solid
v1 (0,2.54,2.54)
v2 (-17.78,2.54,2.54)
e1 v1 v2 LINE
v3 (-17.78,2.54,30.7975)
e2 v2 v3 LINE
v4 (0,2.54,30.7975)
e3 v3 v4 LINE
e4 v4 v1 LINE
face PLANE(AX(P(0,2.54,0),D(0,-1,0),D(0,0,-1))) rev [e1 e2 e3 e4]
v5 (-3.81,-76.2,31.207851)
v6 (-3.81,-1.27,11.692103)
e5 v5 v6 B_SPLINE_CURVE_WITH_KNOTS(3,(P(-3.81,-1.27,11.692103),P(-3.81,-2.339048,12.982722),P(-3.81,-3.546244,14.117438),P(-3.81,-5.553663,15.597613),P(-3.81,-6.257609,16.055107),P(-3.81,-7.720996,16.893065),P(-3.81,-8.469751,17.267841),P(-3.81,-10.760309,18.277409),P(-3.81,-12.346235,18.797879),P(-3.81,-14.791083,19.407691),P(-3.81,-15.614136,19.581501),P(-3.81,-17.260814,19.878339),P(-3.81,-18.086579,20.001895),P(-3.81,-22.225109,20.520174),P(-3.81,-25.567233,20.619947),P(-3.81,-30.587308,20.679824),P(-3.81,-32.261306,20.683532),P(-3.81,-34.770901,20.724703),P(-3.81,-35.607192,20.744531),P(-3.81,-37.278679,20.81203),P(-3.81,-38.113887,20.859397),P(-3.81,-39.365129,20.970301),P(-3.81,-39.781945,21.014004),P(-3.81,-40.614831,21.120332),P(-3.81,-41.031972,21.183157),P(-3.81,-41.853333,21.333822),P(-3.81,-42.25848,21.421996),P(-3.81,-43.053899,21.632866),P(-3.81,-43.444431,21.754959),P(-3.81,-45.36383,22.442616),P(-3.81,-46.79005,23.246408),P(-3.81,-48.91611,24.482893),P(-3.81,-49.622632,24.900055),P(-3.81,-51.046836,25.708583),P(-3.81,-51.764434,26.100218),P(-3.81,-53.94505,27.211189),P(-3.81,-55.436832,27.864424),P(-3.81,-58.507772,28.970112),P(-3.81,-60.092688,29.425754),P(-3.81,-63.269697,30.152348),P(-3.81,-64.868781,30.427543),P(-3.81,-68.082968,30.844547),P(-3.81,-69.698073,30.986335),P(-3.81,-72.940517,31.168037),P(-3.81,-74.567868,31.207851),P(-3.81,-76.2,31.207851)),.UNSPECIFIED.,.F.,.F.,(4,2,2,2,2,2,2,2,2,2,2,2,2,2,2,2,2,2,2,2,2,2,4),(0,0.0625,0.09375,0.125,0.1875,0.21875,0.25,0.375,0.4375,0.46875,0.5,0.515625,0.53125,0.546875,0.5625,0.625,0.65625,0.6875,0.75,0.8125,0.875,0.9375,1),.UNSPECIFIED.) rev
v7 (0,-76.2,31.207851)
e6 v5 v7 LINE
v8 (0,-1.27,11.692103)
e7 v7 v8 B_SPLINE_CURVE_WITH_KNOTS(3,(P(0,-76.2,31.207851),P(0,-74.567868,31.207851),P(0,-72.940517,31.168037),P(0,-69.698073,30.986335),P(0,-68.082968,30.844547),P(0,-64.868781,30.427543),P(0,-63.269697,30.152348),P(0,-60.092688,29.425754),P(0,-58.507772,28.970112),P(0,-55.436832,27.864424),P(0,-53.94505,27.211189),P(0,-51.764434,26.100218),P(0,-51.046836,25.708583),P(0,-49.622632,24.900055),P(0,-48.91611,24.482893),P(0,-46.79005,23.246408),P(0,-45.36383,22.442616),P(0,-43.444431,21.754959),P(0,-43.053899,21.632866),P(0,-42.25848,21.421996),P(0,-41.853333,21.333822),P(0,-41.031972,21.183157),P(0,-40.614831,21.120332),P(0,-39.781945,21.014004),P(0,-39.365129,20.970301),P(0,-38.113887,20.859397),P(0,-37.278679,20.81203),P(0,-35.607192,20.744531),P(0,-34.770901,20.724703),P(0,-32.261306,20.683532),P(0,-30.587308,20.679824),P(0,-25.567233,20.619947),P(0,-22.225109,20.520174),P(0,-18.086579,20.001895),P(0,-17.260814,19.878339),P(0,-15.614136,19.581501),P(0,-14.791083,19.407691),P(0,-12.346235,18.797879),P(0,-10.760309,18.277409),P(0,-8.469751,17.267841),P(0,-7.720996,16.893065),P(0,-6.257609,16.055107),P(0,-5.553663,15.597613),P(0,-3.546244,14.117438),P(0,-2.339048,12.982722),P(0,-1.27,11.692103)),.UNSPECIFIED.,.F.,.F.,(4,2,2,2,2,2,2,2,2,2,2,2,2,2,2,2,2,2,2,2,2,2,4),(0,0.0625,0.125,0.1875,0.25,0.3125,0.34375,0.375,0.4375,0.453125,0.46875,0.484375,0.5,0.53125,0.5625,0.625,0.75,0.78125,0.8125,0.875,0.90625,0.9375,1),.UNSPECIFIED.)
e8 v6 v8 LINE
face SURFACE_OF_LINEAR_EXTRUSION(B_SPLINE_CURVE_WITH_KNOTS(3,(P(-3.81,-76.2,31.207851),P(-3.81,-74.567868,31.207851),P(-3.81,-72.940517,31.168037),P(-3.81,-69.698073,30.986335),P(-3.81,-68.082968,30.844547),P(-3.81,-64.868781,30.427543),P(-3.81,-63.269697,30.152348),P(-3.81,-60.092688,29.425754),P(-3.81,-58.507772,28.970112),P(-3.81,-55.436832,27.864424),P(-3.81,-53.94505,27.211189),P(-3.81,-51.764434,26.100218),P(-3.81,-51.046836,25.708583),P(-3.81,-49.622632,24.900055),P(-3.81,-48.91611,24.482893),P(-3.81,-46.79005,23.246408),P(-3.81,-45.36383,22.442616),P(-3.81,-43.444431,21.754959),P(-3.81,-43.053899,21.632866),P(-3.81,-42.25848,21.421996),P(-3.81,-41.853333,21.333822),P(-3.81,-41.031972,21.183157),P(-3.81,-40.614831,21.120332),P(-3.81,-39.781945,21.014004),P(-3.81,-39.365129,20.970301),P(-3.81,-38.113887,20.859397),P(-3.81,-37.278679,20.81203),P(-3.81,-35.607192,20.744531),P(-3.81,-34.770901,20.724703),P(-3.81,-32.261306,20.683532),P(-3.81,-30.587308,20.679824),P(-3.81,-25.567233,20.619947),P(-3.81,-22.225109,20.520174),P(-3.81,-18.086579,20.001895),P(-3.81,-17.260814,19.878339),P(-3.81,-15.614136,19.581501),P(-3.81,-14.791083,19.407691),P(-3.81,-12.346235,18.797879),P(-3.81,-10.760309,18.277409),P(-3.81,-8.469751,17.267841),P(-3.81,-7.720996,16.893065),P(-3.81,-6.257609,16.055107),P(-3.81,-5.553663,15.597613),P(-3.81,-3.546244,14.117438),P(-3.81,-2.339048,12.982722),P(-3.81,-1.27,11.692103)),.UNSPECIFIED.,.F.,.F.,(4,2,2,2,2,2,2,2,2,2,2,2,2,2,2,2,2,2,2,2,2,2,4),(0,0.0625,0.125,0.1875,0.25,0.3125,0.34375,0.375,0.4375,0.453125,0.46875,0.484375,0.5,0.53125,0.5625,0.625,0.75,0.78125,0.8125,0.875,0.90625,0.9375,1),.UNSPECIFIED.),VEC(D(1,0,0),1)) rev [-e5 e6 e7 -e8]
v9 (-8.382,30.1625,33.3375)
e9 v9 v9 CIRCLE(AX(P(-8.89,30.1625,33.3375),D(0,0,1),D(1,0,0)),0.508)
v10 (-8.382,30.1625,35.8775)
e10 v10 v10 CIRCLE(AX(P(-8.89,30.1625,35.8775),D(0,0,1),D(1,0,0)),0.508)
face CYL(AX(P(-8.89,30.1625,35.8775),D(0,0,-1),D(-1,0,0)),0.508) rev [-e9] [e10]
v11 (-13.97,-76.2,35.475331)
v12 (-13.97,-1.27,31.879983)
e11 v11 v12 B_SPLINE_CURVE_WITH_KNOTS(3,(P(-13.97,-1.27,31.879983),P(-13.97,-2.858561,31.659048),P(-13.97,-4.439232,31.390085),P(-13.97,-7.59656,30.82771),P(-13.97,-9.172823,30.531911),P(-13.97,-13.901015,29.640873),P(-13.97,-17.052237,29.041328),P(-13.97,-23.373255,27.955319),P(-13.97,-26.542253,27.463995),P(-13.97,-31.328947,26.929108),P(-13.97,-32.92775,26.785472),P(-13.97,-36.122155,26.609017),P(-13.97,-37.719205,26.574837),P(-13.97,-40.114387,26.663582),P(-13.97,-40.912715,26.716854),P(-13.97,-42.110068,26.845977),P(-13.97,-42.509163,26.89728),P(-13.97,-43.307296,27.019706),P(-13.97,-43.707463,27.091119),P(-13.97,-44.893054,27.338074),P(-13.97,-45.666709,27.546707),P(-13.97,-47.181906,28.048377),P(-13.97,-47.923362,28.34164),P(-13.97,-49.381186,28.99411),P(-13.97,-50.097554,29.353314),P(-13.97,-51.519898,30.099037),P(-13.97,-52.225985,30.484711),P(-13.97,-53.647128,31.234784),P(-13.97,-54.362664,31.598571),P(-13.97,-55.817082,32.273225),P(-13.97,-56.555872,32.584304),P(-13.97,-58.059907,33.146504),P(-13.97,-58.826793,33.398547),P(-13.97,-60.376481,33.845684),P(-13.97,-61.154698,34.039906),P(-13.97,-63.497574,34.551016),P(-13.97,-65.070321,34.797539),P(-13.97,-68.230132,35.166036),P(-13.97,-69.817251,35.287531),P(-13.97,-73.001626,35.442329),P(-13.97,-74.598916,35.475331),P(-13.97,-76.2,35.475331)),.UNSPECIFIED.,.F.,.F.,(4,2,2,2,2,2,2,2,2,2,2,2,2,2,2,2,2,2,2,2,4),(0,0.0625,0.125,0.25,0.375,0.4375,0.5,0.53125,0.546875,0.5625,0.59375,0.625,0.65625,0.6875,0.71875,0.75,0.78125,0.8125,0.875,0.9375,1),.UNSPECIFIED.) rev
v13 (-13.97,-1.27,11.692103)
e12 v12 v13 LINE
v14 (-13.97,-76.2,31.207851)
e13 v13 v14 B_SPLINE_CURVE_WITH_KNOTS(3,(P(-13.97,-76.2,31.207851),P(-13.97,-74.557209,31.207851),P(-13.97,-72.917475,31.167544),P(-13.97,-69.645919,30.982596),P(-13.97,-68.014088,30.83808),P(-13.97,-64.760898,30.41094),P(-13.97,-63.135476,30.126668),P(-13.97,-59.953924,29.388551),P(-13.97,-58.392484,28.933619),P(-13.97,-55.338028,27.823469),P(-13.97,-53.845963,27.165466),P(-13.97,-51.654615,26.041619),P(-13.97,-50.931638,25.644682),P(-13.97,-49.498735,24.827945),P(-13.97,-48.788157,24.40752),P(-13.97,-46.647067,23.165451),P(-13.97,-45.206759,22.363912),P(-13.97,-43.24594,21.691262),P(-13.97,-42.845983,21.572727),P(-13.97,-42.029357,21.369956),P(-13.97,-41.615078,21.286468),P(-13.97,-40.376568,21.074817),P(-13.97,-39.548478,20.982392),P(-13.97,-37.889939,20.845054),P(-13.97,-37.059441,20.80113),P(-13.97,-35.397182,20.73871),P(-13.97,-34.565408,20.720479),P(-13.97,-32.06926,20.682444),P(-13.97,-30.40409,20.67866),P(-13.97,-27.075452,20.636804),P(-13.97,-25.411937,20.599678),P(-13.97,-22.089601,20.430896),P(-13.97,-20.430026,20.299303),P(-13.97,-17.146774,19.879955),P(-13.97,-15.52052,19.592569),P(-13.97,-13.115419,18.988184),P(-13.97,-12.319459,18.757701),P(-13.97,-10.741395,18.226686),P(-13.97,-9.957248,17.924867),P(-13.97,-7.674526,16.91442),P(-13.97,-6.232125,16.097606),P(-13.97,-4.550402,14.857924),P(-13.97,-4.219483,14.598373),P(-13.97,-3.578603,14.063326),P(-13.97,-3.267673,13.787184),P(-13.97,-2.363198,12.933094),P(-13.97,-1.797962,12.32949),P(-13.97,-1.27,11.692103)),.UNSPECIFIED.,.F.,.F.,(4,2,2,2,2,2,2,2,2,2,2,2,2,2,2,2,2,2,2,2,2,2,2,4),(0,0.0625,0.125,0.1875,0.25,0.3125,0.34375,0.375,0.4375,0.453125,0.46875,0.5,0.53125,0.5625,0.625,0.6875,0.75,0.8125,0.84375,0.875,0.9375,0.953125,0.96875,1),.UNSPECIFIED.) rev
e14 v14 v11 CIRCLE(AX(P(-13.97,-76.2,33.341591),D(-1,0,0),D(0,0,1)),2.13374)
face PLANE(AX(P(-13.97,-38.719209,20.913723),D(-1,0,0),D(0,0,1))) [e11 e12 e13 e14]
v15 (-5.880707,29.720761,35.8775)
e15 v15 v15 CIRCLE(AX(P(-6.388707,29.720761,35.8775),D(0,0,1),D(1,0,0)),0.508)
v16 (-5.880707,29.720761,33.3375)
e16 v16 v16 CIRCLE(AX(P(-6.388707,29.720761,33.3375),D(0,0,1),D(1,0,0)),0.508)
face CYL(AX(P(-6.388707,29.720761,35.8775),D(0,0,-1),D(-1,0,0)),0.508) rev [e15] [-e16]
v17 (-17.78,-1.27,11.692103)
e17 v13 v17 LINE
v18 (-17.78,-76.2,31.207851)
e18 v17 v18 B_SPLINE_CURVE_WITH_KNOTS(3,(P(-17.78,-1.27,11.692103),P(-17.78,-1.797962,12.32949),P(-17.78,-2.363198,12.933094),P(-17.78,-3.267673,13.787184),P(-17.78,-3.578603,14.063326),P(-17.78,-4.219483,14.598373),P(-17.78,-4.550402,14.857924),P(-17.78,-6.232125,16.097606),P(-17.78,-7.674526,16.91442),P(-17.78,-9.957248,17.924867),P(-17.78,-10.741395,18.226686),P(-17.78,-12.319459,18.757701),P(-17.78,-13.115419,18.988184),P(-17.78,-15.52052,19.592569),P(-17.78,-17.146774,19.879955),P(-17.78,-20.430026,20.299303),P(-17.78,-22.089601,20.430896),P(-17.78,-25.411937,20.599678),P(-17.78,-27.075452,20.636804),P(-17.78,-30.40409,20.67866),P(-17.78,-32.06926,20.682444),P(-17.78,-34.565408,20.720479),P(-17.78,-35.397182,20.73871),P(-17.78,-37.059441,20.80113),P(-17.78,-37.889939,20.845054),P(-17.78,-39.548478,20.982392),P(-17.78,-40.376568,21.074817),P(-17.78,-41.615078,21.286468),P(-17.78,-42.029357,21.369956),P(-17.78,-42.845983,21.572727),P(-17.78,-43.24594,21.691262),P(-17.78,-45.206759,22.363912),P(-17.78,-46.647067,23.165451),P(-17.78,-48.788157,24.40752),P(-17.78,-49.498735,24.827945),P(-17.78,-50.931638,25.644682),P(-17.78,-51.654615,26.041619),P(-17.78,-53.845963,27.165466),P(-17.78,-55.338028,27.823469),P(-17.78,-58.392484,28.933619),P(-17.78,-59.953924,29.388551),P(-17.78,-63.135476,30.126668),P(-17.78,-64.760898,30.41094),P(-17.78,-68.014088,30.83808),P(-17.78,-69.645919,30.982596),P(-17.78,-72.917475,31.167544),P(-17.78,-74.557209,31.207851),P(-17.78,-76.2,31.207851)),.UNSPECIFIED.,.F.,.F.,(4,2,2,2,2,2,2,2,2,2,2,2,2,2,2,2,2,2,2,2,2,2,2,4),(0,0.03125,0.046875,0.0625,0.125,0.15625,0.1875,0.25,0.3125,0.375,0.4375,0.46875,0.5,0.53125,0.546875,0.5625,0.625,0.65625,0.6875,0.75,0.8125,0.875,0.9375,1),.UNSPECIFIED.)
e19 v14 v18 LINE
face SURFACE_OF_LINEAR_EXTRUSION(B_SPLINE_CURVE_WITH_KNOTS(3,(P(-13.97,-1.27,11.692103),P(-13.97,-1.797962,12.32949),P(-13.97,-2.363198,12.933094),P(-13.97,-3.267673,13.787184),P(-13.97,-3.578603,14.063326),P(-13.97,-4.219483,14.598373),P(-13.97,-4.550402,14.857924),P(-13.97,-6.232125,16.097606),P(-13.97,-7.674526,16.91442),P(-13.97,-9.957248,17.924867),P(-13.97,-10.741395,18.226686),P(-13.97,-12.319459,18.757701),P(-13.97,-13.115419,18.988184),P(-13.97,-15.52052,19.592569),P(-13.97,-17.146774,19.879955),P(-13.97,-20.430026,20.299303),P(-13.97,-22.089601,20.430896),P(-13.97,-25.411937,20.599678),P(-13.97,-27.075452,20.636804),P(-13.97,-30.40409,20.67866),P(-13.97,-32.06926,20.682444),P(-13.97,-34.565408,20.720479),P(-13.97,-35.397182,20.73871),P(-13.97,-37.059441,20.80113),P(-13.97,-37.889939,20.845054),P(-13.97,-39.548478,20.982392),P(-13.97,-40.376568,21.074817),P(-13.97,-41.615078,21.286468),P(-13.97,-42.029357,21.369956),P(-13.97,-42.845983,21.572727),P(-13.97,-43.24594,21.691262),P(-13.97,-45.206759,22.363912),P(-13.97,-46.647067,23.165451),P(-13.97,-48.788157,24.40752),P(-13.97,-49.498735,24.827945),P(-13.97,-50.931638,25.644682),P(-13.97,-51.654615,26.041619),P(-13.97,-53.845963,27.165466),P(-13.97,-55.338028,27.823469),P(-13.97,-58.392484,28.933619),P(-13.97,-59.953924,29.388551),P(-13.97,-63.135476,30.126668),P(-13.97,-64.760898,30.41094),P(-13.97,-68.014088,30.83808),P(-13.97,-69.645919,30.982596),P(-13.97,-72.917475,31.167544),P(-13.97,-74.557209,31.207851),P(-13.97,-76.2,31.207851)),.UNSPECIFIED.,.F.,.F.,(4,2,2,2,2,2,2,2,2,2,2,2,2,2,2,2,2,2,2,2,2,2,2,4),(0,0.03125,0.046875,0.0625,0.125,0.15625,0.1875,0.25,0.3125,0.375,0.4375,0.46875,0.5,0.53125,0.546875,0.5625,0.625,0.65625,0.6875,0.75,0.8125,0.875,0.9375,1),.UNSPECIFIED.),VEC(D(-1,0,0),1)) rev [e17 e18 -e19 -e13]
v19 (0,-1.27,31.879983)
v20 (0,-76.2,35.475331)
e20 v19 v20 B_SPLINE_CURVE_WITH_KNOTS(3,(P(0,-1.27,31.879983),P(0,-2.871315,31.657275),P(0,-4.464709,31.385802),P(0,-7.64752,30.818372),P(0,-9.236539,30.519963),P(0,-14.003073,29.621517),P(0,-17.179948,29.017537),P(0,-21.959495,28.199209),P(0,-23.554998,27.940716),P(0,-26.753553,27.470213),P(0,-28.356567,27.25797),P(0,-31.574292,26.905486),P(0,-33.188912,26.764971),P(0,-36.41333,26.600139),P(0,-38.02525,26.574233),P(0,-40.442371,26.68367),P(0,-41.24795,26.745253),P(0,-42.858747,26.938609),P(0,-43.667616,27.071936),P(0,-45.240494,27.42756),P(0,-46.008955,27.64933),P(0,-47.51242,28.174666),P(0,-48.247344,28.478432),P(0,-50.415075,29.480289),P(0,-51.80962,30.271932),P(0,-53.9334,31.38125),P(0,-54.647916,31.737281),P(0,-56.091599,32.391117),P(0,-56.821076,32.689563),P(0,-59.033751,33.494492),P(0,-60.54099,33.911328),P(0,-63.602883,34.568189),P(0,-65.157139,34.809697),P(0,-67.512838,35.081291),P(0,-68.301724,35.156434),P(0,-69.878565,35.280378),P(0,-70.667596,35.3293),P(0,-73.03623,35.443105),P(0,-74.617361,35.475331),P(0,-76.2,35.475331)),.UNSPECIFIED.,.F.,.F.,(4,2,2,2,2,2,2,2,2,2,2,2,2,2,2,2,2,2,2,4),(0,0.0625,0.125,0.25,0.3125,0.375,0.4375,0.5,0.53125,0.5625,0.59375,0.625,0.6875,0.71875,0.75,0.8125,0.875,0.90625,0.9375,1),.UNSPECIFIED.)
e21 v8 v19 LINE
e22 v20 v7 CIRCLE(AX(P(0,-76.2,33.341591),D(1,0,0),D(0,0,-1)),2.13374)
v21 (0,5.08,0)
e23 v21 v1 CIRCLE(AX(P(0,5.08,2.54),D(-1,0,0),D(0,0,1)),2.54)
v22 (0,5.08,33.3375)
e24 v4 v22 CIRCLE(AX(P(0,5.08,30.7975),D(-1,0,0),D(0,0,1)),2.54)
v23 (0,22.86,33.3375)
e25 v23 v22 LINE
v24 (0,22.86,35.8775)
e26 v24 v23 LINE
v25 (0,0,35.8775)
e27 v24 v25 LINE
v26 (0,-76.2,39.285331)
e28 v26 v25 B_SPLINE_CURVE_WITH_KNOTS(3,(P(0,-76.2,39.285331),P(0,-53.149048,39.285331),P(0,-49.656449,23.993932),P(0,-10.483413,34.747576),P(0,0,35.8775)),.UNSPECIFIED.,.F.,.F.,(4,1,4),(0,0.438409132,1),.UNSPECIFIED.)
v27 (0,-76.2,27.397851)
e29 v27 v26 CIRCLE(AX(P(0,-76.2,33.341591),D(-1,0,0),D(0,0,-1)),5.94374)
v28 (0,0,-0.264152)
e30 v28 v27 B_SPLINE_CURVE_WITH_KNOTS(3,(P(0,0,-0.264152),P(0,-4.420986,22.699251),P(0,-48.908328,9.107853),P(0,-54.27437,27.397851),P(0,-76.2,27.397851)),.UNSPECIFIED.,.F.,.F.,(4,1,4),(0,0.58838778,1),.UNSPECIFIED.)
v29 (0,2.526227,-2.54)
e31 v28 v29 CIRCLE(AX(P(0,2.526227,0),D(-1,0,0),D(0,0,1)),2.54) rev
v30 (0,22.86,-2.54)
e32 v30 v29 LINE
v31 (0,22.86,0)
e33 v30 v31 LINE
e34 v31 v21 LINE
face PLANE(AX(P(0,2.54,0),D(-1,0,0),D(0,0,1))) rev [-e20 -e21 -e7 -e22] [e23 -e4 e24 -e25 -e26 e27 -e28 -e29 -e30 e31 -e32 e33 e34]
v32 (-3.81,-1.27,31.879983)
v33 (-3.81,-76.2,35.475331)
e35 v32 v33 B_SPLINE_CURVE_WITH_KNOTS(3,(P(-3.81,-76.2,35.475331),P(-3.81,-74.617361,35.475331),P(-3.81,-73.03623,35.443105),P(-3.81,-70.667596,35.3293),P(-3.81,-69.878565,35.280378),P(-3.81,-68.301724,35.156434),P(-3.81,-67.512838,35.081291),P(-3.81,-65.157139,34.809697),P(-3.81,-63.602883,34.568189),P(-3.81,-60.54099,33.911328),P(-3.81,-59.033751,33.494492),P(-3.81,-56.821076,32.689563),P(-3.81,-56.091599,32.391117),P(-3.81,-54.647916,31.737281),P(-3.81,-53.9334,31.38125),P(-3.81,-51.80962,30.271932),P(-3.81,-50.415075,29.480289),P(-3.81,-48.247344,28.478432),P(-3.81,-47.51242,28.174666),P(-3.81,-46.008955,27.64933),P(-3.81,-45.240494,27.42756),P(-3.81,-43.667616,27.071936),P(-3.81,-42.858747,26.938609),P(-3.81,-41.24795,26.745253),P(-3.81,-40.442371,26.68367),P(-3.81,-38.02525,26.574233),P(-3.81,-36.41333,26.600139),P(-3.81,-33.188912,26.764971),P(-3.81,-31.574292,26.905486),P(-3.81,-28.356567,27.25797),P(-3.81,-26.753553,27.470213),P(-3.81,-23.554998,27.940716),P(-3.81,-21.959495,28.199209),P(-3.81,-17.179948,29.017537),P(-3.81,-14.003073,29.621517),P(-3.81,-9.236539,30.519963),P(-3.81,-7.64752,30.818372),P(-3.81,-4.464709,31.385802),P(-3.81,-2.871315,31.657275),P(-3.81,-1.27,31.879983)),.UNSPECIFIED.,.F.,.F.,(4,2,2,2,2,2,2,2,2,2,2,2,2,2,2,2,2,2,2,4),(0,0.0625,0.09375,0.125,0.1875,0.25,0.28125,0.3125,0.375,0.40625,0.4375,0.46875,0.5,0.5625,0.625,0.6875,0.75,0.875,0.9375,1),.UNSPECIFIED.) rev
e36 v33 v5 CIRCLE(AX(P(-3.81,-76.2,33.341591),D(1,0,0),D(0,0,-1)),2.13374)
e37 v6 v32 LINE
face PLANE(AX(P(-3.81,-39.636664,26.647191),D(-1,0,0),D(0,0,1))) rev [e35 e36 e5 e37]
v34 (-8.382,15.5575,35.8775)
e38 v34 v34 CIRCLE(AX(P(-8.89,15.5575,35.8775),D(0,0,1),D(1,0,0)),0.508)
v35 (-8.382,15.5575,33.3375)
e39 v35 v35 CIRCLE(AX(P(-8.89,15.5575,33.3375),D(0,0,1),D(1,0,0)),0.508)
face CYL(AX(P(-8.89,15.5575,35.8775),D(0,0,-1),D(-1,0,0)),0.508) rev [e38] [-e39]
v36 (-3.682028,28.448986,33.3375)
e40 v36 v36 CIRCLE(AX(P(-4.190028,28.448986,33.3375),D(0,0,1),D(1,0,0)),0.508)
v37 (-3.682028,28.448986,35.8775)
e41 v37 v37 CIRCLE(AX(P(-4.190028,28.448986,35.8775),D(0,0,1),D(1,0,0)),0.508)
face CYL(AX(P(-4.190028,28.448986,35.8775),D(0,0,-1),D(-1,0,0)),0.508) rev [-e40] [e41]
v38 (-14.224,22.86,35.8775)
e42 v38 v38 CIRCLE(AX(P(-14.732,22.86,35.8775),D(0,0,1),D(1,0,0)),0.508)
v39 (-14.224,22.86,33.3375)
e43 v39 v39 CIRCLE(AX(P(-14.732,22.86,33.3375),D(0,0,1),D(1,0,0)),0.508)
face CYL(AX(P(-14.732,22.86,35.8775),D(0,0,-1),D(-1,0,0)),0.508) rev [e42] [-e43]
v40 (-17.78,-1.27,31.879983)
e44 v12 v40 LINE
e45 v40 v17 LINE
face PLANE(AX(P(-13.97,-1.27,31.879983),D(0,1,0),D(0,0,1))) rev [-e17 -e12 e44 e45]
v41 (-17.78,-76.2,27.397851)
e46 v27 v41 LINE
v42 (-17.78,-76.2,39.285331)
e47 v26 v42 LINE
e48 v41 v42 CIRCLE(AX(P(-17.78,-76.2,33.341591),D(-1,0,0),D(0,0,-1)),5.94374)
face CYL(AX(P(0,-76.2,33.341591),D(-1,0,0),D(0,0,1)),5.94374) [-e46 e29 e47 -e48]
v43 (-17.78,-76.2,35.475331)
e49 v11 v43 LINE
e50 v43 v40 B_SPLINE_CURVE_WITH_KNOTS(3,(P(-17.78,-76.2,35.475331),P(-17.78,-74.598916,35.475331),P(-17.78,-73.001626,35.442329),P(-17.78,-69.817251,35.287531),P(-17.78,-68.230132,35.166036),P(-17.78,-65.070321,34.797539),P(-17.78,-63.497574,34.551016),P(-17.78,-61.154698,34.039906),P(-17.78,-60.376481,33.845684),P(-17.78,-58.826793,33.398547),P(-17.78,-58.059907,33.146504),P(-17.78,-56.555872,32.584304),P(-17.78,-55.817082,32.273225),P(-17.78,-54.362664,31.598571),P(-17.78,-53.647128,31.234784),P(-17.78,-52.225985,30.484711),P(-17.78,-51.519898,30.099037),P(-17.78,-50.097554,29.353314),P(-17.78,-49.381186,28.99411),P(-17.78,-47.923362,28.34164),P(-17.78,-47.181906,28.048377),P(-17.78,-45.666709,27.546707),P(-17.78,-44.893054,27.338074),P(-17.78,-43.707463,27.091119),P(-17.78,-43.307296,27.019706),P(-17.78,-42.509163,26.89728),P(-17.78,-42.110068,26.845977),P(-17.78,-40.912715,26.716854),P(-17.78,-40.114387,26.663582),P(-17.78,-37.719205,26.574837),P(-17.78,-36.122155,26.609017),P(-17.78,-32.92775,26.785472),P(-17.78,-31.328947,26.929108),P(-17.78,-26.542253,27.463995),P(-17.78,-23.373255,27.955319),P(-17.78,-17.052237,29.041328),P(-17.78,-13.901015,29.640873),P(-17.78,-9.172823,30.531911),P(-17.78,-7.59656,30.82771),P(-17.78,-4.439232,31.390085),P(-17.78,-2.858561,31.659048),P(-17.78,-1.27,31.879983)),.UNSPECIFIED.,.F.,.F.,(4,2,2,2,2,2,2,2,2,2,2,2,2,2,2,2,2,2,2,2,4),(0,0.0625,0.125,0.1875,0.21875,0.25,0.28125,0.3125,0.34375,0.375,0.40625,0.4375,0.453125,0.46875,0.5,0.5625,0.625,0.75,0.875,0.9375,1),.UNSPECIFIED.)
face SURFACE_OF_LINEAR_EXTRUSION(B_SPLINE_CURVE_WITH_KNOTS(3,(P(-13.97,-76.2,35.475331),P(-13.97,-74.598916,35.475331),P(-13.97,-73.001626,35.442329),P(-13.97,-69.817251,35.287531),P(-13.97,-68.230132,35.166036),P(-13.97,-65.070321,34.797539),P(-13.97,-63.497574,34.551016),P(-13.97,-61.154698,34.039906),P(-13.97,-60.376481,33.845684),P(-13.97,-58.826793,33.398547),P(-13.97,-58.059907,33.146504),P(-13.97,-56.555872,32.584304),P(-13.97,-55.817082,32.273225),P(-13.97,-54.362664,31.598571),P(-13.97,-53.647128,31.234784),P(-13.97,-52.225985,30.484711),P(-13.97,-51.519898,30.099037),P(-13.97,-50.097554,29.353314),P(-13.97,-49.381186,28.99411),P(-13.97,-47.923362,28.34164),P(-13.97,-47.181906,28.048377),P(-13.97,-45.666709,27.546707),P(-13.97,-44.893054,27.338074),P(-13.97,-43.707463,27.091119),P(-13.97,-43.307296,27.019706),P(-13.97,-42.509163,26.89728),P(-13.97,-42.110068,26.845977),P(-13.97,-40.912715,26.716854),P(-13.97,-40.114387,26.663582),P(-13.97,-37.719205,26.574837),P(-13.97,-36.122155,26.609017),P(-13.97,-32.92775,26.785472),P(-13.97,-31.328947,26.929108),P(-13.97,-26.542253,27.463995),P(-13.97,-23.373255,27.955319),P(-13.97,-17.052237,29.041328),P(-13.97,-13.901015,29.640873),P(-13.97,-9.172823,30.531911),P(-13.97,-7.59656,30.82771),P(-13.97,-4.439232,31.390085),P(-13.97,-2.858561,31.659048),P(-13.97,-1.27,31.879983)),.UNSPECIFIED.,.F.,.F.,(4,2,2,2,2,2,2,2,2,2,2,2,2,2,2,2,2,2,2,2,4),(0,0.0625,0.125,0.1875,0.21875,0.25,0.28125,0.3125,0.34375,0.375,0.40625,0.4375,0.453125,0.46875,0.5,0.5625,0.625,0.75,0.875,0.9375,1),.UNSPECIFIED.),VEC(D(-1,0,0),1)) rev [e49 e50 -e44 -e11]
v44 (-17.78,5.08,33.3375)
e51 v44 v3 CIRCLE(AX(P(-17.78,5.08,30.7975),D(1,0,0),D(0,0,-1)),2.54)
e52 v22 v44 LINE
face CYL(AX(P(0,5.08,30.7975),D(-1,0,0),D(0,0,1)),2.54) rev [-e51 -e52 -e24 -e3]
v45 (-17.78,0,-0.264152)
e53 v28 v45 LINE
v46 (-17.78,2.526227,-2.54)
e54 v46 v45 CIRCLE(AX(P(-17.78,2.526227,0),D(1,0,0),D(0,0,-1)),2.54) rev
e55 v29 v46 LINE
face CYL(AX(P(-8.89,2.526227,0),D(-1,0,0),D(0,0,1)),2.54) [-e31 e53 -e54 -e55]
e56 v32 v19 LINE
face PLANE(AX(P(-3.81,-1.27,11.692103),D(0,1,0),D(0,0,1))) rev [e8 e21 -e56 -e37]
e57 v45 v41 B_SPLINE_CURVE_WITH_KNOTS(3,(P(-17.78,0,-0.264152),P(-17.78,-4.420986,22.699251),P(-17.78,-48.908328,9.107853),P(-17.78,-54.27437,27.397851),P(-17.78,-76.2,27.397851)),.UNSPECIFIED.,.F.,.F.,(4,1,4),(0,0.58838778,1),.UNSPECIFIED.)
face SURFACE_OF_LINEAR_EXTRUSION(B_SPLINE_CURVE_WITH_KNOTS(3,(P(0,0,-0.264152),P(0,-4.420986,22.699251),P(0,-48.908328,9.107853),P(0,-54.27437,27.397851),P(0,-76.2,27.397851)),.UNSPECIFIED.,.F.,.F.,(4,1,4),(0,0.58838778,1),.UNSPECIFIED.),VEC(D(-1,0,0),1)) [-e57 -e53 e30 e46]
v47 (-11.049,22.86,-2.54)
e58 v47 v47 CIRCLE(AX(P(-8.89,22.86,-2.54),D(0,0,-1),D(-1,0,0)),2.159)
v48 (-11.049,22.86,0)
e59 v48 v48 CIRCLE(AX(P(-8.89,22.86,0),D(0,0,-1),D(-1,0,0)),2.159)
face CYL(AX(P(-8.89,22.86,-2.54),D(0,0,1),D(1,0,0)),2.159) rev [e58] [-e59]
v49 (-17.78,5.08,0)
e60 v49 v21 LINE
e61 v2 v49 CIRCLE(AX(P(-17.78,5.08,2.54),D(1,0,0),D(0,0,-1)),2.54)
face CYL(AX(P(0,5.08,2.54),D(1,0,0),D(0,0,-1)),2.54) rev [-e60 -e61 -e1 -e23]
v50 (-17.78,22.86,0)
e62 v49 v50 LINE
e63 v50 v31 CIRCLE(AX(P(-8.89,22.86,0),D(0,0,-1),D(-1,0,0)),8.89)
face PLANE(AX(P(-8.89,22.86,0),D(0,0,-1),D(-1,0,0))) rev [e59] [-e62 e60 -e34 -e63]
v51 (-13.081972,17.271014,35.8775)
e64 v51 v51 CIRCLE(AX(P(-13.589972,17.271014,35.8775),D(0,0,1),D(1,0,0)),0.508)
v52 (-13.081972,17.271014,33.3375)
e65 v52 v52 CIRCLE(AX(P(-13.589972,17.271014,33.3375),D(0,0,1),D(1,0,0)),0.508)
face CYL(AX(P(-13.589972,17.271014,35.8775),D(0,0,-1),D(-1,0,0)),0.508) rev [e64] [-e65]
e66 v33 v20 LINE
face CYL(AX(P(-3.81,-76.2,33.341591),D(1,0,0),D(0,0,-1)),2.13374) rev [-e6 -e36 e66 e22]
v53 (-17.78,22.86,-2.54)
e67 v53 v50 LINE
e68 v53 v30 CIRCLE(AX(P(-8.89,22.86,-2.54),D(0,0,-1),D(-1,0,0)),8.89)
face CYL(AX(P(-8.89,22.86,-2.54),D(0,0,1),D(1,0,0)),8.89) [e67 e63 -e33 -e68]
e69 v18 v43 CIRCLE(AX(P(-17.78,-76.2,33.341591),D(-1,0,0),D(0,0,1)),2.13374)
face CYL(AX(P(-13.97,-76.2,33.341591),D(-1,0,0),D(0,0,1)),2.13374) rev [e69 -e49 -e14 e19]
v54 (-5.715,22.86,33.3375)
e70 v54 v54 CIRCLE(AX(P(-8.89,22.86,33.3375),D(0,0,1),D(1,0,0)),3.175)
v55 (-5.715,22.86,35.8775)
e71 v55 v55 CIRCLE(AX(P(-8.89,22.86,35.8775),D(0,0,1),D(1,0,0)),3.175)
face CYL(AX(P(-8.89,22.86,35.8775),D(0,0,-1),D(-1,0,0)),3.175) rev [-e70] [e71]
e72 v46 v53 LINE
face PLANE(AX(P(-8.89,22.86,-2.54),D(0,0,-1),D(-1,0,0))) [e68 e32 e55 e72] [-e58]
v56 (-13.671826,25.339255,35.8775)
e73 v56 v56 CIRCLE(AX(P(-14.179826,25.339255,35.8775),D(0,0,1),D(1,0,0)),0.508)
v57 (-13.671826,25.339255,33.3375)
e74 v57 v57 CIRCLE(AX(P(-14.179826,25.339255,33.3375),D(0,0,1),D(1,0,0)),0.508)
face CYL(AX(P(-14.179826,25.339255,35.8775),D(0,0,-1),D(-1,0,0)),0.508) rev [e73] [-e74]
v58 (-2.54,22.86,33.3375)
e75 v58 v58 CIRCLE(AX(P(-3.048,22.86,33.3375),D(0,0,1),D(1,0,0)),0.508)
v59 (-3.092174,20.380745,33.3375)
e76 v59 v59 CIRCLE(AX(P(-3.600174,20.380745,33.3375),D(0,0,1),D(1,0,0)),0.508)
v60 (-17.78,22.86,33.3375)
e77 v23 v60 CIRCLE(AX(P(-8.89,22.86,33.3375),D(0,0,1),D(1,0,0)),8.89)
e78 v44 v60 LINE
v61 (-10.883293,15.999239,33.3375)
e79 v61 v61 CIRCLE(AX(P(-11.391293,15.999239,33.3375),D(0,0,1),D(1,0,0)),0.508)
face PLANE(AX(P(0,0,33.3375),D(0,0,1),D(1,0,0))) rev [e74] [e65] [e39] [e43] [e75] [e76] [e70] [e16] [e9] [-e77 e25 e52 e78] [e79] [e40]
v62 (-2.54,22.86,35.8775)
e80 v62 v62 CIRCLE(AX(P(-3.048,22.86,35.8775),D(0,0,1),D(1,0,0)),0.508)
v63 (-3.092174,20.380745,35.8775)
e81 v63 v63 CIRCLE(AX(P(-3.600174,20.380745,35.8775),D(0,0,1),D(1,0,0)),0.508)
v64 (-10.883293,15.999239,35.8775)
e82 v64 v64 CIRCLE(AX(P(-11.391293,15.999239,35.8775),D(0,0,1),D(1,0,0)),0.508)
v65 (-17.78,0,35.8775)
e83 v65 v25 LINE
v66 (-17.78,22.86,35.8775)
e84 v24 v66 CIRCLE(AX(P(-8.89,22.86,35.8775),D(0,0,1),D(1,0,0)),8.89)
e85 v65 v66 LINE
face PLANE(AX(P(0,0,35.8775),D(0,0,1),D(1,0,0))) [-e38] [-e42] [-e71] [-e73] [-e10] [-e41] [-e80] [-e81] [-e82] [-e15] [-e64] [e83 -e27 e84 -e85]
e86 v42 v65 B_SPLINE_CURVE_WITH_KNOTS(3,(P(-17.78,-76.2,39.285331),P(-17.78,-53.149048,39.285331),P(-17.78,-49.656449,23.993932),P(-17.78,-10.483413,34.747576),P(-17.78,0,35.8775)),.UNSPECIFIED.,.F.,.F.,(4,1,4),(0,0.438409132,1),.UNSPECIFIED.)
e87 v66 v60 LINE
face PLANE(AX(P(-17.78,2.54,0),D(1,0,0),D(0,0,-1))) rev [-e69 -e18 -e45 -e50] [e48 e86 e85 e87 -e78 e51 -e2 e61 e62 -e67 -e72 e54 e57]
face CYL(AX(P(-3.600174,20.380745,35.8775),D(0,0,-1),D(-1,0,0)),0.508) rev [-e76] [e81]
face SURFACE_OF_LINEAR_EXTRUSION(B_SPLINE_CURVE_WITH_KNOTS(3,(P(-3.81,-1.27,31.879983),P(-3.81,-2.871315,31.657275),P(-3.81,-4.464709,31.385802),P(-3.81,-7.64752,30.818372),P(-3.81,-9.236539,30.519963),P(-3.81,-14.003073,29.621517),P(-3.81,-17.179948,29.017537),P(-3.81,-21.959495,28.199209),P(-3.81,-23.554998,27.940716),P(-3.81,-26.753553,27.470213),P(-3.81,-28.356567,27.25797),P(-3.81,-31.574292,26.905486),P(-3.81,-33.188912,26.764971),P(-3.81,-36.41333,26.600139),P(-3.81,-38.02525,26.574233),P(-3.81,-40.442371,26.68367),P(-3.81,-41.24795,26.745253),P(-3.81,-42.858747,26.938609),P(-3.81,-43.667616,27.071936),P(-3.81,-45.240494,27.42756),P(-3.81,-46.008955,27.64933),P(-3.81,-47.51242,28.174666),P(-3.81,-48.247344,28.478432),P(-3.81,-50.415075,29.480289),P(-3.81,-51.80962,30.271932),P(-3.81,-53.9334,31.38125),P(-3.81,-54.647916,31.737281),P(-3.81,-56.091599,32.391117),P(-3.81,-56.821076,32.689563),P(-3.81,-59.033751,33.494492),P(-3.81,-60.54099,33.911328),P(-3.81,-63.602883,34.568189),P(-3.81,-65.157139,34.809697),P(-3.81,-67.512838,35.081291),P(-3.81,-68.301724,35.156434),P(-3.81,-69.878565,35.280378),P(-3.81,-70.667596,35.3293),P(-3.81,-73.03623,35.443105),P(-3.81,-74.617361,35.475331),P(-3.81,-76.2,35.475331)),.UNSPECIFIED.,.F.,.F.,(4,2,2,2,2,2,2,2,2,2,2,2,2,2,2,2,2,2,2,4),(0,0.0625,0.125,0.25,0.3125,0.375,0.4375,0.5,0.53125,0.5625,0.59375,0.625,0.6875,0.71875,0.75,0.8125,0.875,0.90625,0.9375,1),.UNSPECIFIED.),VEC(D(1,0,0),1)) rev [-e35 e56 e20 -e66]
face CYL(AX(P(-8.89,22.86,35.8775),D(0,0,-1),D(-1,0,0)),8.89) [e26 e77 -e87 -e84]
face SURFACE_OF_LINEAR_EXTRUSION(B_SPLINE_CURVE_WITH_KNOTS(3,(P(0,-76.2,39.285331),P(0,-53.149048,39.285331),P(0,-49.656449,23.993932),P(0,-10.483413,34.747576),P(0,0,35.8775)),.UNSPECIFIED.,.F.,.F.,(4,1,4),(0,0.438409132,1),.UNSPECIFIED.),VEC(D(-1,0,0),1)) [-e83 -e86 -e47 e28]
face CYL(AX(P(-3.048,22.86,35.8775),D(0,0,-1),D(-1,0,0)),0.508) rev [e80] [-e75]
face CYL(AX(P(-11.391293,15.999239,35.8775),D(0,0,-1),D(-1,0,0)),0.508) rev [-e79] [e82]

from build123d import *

# Parameters (mm, degrees)
SKETCH1_W           = 17.78
SKETCH1_H           = 33.3375
BOSS_EXTRUDE1_DEPTH = 2.54
SKETCH2_R           = 0.508
SKETCH2_R_2         = 3.175
BOSS_EXTRUDE2_DEPTH = 2.54
BOSS_EXTRUDE3_START = 2.54
SKETCH3_R           = 2.159
BOSS_EXTRUDE3_DEPTH = 2.54
BOSS_EXTRUDE5_DEPTH = 17.78
CUT_EXTRUDE2_DEPTH  = 3.81
CUT_EXTRUDE3_START  = -3.81
CUT_EXTRUDE3_DEPTH  = 3.81
FILLET1_START       = -19
FILLET1_DEPTH       = 20
FILLET1_START_2     = -17.78
FILLET1_2_DEPTH     = 17.78


with BuildPart() as part:
    # Sketch1 → Boss-Extrude1 (new body)
    with BuildSketch(Plane(origin=(0, 0, 0), x_dir=(1, 0, 0), z_dir=(0, 1, 0))):
        with Locations((-8.89, -16.66875)):
            Rectangle(SKETCH1_W, SKETCH1_H)
    extrude(amount=BOSS_EXTRUDE1_DEPTH)

    # Sketch2 → Boss-Extrude2 (add)
    with BuildSketch(Plane.XY.offset(33.3375)):
        with BuildLine():
            Line((-17.78, 0), (0, 0))
            Line((0, 0), (0, 22.86))
            ThreePointArc((0, 22.86), (-8.89, 31.75), (-17.78, 22.86))
            Line((-17.78, 22.86), (-17.78, 0))
        make_face()
        with Locations((-4.190027947, 28.448986398)):
            Circle(SKETCH2_R, mode=Mode.SUBTRACT)
        with Locations((-8.89, 15.5575)):
            Circle(SKETCH2_R, mode=Mode.SUBTRACT)
        with Locations((-13.589972053, 17.271013602)):
            Circle(SKETCH2_R, mode=Mode.SUBTRACT)
        with Locations((-14.732, 22.86)):
            Circle(SKETCH2_R, mode=Mode.SUBTRACT)
        with Locations((-11.391292974, 15.99923913)):
            Circle(SKETCH2_R, mode=Mode.SUBTRACT)
        with Locations((-14.179826087, 25.339254721)):
            Circle(SKETCH2_R, mode=Mode.SUBTRACT)
        with Locations((-8.89, 22.86)):
            Circle(SKETCH2_R_2, mode=Mode.SUBTRACT)
        with Locations((-3.600173913, 20.380745279)):
            Circle(SKETCH2_R, mode=Mode.SUBTRACT)
        with Locations((-3.048, 22.86)):
            Circle(SKETCH2_R, mode=Mode.SUBTRACT)
        with Locations((-8.89, 30.1625)):
            Circle(SKETCH2_R, mode=Mode.SUBTRACT)
        with Locations((-6.388707026, 29.72076087)):
            Circle(SKETCH2_R, mode=Mode.SUBTRACT)
    extrude(amount=BOSS_EXTRUDE2_DEPTH)

    # Sketch3 → Boss-Extrude3 (add)
    with BuildSketch(Plane(origin=(0, 0, 0), x_dir=(-1, 0, 0), z_dir=(0, 0, -1)).offset(BOSS_EXTRUDE3_START)):
        with BuildLine():
            Line((0, 22.86), (0, 0))
            Line((0, 0), (17.78, 0))
            Line((17.78, 0), (17.78, 22.86))
            ThreePointArc((17.78, 22.86), (8.89, 31.75), (0, 22.86))
        make_face()
        with Locations((8.89, 22.86)):
            Circle(SKETCH3_R, mode=Mode.SUBTRACT)
    extrude(amount=-BOSS_EXTRUDE3_DEPTH)

    # Sketch7 → Boss-Extrude5 (add)
    with BuildSketch(Plane.ZY.offset(17.78)):
        with BuildLine():
            Line((-0.264151635, 0), (35.8775, 0))
            add(Edge.make_bspline(
                [(35.8775, 0), (34.747575759, -10.483413435), (23.993931567, -49.656448715), (39.285331068, -53.149048012), (39.285331068, -76.2)],
                knots=[0, 0, 0, 0, 0.561590868, 1, 1, 1, 1], degree=3))
            ThreePointArc((39.285331068, -76.2), (33.341590809, -82.143740259), (27.39785055, -76.2))
            add(Edge.make_bspline(
                [(-0.264151635, 0), (22.699251274, -4.420985832), (9.107853477, -48.908327851), (27.39785055, -54.27437044), (27.39785055, -76.2)],
                knots=[0, 0, 0, 0, 0.58838778, 1, 1, 1, 1], degree=3))
        make_face()
    extrude(amount=-BOSS_EXTRUDE5_DEPTH)

    # Sketch8 → Cut-Extrude2 (cut)
    with BuildSketch(Plane.ZY.offset(17.78)):
        with BuildLine():
            Line((31.87998254, -1.27), (11.692102825, -1.27))
            add(Edge.make_bspline(
                [(11.692102825, -1.27), (12.329490215, -1.797961739), (12.933094236, -2.363198397), (13.787184198, -3.267673027), (14.063326101, -3.578603465), (14.598372835, -4.219482884), (14.857923986, -4.550402014), (16.097605696, -6.232124946), (16.914419625, -7.674525947), (17.924867424, -9.957247581), (18.226686047, -10.741395079), (18.75770144, -12.319459012), (18.988184221, -13.115418962), (19.592569091, -15.520520104), (19.879955273, -17.146774279), (20.299302948, -20.430025875), (20.430895911, -22.089601111), (20.599678207, -25.411936863), (20.636803846, -27.075451594), (20.67865973, -30.404089571), (20.682443911, -32.069259792), (20.720479253, -34.565408412), (20.738709961, -35.397182268), (20.801129707, -37.059441081), (20.845054145, -37.889939176), (20.982392235, -39.548478099), (21.074816708, -40.376568042), (21.286468297, -41.615077579), (21.36995575, -42.029357232), (21.572726897, -42.845983081), (21.691262012, -43.245940154), (22.363912109, -45.206759154), (23.165451305, -46.647067415), (24.407519941, -48.78815743), (24.827945274, -49.498734604), (25.64468202, -50.93163809), (26.041618909, -51.654615352), (27.165466006, -53.845963493), (27.8234689, -55.338028422), (28.933619451, -58.392484093), (29.388551341, -59.953923666), (30.126668316, -63.135476247), (30.410939534, -64.760898165), (30.838079835, -68.014087747), (30.982595978, -69.645919189), (31.167543607, -72.917475244), (31.20785055, -74.557209301), (31.20785055, -76.2)],
                knots=[0, 0, 0, 0, 0.03125, 0.03125, 0.046875, 0.046875, 0.0625, 0.0625, 0.125, 0.125, 0.15625, 0.15625, 0.1875, 0.1875, 0.25, 0.25, 0.3125, 0.3125, 0.375, 0.375, 0.4375, 0.4375, 0.46875, 0.46875, 0.5, 0.5, 0.53125, 0.53125, 0.546875, 0.546875, 0.5625, 0.5625, 0.625, 0.625, 0.65625, 0.65625, 0.6875, 0.6875, 0.75, 0.75, 0.8125, 0.8125, 0.875, 0.875, 0.9375, 0.9375, 1, 1, 1, 1], degree=3))
            ThreePointArc((31.20785055, -76.2), (33.341590809, -78.333740259), (35.475331068, -76.2))
            add(Edge.make_bspline(
                [(35.475331068, -76.2), (35.475331068, -74.59891608), (35.442328522, -73.001625639), (35.287530724, -69.817251041), (35.166036456, -68.230132286), (34.79753857, -65.070321456), (34.55101578, -63.497574112), (34.039906006, -61.154697774), (33.84568435, -60.376480634), (33.398546609, -58.826792987), (33.146503607, -58.05990662), (32.584304123, -56.555872408), (32.273225256, -55.817082229), (31.598571017, -54.362663568), (31.234783966, -53.64712848), (30.484711446, -52.225984708), (30.099036577, -51.51989769), (29.353314006, -50.097553632), (28.994109895, -49.38118555), (28.341640461, -47.923362101), (28.048377395, -47.181905876), (27.546707249, -45.666708842), (27.338073983, -44.893054089), (27.09111876, -43.70746341), (27.01970601, -43.307296259), (26.897279987, -42.509162839), (26.845976833, -42.1100683), (26.716854196, -40.912715076), (26.663581813, -40.114387456), (26.574836598, -37.719205009), (26.609016601, -36.12215458), (26.785471939, -32.927750164), (26.929107807, -31.328947255), (27.463994787, -26.542252957), (27.955318949, -23.373254872), (29.041327858, -17.052236889), (29.640872623, -13.901015305), (30.531911147, -9.172823068), (30.827709929, -7.596559566), (31.390084509, -4.439232344), (31.659048397, -2.858560896), (31.87998254, -1.27)],
                knots=[0, 0, 0, 0, 0.0625, 0.0625, 0.125, 0.125, 0.1875, 0.1875, 0.21875, 0.21875, 0.25, 0.25, 0.28125, 0.28125, 0.3125, 0.3125, 0.34375, 0.34375, 0.375, 0.375, 0.40625, 0.40625, 0.4375, 0.4375, 0.453125, 0.453125, 0.46875, 0.46875, 0.5, 0.5, 0.5625, 0.5625, 0.625, 0.625, 0.75, 0.75, 0.875, 0.875, 0.9375, 0.9375, 1, 1, 1, 1], degree=3))
        make_face()
    extrude(amount=-CUT_EXTRUDE2_DEPTH, mode=Mode.SUBTRACT)

    # Sketch9 → Cut-Extrude3 (cut)
    with BuildSketch(Plane(origin=(0, 0, 0), x_dir=(0, 0, -1), z_dir=(1, 0, 0)).offset(CUT_EXTRUDE3_START)):
        with BuildLine():
            Line((-11.692102825, -1.27), (-31.87998254, -1.27))
            add(Edge.make_bspline(
                [(-31.87998254, -1.27), (-31.657274592, -2.871314909), (-31.385801547, -4.464709015), (-30.818371841, -7.647520411), (-30.519962643, -9.236539341), (-29.621517161, -14.003073455), (-29.017536871, -17.179948025), (-28.199208606, -21.959495394), (-27.940716, -23.554997883), (-27.470213202, -26.753552893), (-27.257969555, -28.356567493), (-26.905486134, -31.574292118), (-26.764970951, -33.188911509), (-26.600139399, -36.413329948), (-26.5742329, -38.025249954), (-26.68367025, -40.442370979), (-26.74525272, -41.247949508), (-26.938608863, -42.85874733), (-27.071936421, -43.667615889), (-27.427560468, -45.240494251), (-27.649330164, -46.008954577), (-28.17466612, -47.512420124), (-28.47843167, -48.247343835), (-29.480288911, -50.415075343), (-30.271932345, -51.809620123), (-31.381249819, -53.933399988), (-31.737281071, -54.64791605), (-32.39111668, -56.091599244), (-32.689563076, -56.821075957), (-33.494491888, -59.033751249), (-33.911327537, -60.540990207), (-34.568189194, -63.60288278), (-34.809697436, -65.157138907), (-35.081291118, -67.512837521), (-35.156433699, -68.301724496), (-35.28037816, -69.878565078), (-35.329299977, -70.667595867), (-35.443105132, -73.036230119), (-35.475331068, -74.617361294), (-35.475331068, -76.2)],
                knots=[0, 0, 0, 0, 0.0625, 0.0625, 0.125, 0.125, 0.25, 0.25, 0.3125, 0.3125, 0.375, 0.375, 0.4375, 0.4375, 0.5, 0.5, 0.53125, 0.53125, 0.5625, 0.5625, 0.59375, 0.59375, 0.625, 0.625, 0.6875, 0.6875, 0.71875, 0.71875, 0.75, 0.75, 0.8125, 0.8125, 0.875, 0.875, 0.90625, 0.90625, 0.9375, 0.9375, 1, 1, 1, 1], degree=3))
            ThreePointArc((-35.475331068, -76.2), (-33.341590809, -78.333740259), (-31.20785055, -76.2))
            add(Edge.make_bspline(
                [(-31.20785055, -76.2), (-31.20785055, -74.567868048), (-31.16803655, -72.940517258), (-30.986335459, -69.698073378), (-30.844546912, -68.082968453), (-30.427543331, -64.868781453), (-30.152347923, -63.26969702), (-29.42575358, -60.09268799), (-28.970111579, -58.507772228), (-27.864424367, -55.43683222), (-27.211188917, -53.94504957), (-26.100218097, -51.764433844), (-25.708582932, -51.04683605), (-24.900055321, -49.622631633), (-24.482893419, -48.916109599), (-23.246407855, -46.790049869), (-22.442616166, -45.363829892), (-21.754958623, -43.444430809), (-21.632865788, -43.053898787), (-21.42199591, -42.258479656), (-21.333822228, -41.853332571), (-21.183157231, -41.031972401), (-21.120331601, -40.614830886), (-21.014003569, -39.781944527), (-20.970300665, -39.365128906), (-20.859397069, -38.113886662), (-20.812029535, -37.278679299), (-20.744530591, -35.60719241), (-20.724703124, -34.770900921), (-20.68353212, -32.261305616), (-20.679823958, -30.587307578), (-20.619946936, -25.567232626), (-20.520174116, -22.225109346), (-20.001894527, -18.086578744), (-19.878339369, -17.260814066), (-19.581501223, -15.614136338), (-19.407691345, -14.791082652), (-18.797878992, -12.346234841), (-18.277408614, -10.760308547), (-17.267840939, -8.469751296), (-16.893065224, -7.720996496), (-16.05510709, -6.257608567), (-15.597612775, -5.553662739), (-14.117437586, -3.546243805), (-12.982722301, -2.339047983), (-11.692102825, -1.27)],
                knots=[0, 0, 0, 0, 0.0625, 0.0625, 0.125, 0.125, 0.1875, 0.1875, 0.25, 0.25, 0.3125, 0.3125, 0.34375, 0.34375, 0.375, 0.375, 0.4375, 0.4375, 0.453125, 0.453125, 0.46875, 0.46875, 0.484375, 0.484375, 0.5, 0.5, 0.53125, 0.53125, 0.5625, 0.5625, 0.625, 0.625, 0.75, 0.75, 0.78125, 0.78125, 0.8125, 0.8125, 0.875, 0.875, 0.90625, 0.90625, 0.9375, 0.9375, 1, 1, 1, 1], degree=3))
        make_face()
    extrude(amount=CUT_EXTRUDE3_DEPTH, mode=Mode.SUBTRACT)

    # Fillet1: read off the stored shape, not the designer's step
    # Fillet1 outline → Fillet1 (cut)
    with BuildSketch(Plane.YZ.offset(FILLET1_START)):
        with BuildLine():
            Line((0, -2.54), (2.526227209, -2.54))
            ThreePointArc((2.526227209, -2.54), (0.826130911, -1.887133428), (0, -0.264151635))
            Line((0, -0.264151635), (0, -2.54))
        make_face()
    extrude(amount=FILLET1_DEPTH, mode=Mode.SUBTRACT)

    # Fillet1 2 outline → Fillet1 2 (add)
    with BuildSketch(Plane.YZ.offset(FILLET1_START_2)):
        with BuildLine():
            Line((2.54, 33.3375), (2.54, 30.7975))
            ThreePointArc((2.54, 30.7975), (3.283948776, 32.593551224), (5.08, 33.3375))
            Line((5.08, 33.3375), (2.54, 33.3375))
        make_face()
        with BuildLine():
            ThreePointArc((5.08, 0), (3.283948776, 0.743948776), (2.54, 2.54))
            Line((2.54, 2.54), (2.54, 0))
            Line((2.54, 0), (5.08, 0))
        make_face()
    extrude(amount=FILLET1_2_DEPTH)


solid = part.part
